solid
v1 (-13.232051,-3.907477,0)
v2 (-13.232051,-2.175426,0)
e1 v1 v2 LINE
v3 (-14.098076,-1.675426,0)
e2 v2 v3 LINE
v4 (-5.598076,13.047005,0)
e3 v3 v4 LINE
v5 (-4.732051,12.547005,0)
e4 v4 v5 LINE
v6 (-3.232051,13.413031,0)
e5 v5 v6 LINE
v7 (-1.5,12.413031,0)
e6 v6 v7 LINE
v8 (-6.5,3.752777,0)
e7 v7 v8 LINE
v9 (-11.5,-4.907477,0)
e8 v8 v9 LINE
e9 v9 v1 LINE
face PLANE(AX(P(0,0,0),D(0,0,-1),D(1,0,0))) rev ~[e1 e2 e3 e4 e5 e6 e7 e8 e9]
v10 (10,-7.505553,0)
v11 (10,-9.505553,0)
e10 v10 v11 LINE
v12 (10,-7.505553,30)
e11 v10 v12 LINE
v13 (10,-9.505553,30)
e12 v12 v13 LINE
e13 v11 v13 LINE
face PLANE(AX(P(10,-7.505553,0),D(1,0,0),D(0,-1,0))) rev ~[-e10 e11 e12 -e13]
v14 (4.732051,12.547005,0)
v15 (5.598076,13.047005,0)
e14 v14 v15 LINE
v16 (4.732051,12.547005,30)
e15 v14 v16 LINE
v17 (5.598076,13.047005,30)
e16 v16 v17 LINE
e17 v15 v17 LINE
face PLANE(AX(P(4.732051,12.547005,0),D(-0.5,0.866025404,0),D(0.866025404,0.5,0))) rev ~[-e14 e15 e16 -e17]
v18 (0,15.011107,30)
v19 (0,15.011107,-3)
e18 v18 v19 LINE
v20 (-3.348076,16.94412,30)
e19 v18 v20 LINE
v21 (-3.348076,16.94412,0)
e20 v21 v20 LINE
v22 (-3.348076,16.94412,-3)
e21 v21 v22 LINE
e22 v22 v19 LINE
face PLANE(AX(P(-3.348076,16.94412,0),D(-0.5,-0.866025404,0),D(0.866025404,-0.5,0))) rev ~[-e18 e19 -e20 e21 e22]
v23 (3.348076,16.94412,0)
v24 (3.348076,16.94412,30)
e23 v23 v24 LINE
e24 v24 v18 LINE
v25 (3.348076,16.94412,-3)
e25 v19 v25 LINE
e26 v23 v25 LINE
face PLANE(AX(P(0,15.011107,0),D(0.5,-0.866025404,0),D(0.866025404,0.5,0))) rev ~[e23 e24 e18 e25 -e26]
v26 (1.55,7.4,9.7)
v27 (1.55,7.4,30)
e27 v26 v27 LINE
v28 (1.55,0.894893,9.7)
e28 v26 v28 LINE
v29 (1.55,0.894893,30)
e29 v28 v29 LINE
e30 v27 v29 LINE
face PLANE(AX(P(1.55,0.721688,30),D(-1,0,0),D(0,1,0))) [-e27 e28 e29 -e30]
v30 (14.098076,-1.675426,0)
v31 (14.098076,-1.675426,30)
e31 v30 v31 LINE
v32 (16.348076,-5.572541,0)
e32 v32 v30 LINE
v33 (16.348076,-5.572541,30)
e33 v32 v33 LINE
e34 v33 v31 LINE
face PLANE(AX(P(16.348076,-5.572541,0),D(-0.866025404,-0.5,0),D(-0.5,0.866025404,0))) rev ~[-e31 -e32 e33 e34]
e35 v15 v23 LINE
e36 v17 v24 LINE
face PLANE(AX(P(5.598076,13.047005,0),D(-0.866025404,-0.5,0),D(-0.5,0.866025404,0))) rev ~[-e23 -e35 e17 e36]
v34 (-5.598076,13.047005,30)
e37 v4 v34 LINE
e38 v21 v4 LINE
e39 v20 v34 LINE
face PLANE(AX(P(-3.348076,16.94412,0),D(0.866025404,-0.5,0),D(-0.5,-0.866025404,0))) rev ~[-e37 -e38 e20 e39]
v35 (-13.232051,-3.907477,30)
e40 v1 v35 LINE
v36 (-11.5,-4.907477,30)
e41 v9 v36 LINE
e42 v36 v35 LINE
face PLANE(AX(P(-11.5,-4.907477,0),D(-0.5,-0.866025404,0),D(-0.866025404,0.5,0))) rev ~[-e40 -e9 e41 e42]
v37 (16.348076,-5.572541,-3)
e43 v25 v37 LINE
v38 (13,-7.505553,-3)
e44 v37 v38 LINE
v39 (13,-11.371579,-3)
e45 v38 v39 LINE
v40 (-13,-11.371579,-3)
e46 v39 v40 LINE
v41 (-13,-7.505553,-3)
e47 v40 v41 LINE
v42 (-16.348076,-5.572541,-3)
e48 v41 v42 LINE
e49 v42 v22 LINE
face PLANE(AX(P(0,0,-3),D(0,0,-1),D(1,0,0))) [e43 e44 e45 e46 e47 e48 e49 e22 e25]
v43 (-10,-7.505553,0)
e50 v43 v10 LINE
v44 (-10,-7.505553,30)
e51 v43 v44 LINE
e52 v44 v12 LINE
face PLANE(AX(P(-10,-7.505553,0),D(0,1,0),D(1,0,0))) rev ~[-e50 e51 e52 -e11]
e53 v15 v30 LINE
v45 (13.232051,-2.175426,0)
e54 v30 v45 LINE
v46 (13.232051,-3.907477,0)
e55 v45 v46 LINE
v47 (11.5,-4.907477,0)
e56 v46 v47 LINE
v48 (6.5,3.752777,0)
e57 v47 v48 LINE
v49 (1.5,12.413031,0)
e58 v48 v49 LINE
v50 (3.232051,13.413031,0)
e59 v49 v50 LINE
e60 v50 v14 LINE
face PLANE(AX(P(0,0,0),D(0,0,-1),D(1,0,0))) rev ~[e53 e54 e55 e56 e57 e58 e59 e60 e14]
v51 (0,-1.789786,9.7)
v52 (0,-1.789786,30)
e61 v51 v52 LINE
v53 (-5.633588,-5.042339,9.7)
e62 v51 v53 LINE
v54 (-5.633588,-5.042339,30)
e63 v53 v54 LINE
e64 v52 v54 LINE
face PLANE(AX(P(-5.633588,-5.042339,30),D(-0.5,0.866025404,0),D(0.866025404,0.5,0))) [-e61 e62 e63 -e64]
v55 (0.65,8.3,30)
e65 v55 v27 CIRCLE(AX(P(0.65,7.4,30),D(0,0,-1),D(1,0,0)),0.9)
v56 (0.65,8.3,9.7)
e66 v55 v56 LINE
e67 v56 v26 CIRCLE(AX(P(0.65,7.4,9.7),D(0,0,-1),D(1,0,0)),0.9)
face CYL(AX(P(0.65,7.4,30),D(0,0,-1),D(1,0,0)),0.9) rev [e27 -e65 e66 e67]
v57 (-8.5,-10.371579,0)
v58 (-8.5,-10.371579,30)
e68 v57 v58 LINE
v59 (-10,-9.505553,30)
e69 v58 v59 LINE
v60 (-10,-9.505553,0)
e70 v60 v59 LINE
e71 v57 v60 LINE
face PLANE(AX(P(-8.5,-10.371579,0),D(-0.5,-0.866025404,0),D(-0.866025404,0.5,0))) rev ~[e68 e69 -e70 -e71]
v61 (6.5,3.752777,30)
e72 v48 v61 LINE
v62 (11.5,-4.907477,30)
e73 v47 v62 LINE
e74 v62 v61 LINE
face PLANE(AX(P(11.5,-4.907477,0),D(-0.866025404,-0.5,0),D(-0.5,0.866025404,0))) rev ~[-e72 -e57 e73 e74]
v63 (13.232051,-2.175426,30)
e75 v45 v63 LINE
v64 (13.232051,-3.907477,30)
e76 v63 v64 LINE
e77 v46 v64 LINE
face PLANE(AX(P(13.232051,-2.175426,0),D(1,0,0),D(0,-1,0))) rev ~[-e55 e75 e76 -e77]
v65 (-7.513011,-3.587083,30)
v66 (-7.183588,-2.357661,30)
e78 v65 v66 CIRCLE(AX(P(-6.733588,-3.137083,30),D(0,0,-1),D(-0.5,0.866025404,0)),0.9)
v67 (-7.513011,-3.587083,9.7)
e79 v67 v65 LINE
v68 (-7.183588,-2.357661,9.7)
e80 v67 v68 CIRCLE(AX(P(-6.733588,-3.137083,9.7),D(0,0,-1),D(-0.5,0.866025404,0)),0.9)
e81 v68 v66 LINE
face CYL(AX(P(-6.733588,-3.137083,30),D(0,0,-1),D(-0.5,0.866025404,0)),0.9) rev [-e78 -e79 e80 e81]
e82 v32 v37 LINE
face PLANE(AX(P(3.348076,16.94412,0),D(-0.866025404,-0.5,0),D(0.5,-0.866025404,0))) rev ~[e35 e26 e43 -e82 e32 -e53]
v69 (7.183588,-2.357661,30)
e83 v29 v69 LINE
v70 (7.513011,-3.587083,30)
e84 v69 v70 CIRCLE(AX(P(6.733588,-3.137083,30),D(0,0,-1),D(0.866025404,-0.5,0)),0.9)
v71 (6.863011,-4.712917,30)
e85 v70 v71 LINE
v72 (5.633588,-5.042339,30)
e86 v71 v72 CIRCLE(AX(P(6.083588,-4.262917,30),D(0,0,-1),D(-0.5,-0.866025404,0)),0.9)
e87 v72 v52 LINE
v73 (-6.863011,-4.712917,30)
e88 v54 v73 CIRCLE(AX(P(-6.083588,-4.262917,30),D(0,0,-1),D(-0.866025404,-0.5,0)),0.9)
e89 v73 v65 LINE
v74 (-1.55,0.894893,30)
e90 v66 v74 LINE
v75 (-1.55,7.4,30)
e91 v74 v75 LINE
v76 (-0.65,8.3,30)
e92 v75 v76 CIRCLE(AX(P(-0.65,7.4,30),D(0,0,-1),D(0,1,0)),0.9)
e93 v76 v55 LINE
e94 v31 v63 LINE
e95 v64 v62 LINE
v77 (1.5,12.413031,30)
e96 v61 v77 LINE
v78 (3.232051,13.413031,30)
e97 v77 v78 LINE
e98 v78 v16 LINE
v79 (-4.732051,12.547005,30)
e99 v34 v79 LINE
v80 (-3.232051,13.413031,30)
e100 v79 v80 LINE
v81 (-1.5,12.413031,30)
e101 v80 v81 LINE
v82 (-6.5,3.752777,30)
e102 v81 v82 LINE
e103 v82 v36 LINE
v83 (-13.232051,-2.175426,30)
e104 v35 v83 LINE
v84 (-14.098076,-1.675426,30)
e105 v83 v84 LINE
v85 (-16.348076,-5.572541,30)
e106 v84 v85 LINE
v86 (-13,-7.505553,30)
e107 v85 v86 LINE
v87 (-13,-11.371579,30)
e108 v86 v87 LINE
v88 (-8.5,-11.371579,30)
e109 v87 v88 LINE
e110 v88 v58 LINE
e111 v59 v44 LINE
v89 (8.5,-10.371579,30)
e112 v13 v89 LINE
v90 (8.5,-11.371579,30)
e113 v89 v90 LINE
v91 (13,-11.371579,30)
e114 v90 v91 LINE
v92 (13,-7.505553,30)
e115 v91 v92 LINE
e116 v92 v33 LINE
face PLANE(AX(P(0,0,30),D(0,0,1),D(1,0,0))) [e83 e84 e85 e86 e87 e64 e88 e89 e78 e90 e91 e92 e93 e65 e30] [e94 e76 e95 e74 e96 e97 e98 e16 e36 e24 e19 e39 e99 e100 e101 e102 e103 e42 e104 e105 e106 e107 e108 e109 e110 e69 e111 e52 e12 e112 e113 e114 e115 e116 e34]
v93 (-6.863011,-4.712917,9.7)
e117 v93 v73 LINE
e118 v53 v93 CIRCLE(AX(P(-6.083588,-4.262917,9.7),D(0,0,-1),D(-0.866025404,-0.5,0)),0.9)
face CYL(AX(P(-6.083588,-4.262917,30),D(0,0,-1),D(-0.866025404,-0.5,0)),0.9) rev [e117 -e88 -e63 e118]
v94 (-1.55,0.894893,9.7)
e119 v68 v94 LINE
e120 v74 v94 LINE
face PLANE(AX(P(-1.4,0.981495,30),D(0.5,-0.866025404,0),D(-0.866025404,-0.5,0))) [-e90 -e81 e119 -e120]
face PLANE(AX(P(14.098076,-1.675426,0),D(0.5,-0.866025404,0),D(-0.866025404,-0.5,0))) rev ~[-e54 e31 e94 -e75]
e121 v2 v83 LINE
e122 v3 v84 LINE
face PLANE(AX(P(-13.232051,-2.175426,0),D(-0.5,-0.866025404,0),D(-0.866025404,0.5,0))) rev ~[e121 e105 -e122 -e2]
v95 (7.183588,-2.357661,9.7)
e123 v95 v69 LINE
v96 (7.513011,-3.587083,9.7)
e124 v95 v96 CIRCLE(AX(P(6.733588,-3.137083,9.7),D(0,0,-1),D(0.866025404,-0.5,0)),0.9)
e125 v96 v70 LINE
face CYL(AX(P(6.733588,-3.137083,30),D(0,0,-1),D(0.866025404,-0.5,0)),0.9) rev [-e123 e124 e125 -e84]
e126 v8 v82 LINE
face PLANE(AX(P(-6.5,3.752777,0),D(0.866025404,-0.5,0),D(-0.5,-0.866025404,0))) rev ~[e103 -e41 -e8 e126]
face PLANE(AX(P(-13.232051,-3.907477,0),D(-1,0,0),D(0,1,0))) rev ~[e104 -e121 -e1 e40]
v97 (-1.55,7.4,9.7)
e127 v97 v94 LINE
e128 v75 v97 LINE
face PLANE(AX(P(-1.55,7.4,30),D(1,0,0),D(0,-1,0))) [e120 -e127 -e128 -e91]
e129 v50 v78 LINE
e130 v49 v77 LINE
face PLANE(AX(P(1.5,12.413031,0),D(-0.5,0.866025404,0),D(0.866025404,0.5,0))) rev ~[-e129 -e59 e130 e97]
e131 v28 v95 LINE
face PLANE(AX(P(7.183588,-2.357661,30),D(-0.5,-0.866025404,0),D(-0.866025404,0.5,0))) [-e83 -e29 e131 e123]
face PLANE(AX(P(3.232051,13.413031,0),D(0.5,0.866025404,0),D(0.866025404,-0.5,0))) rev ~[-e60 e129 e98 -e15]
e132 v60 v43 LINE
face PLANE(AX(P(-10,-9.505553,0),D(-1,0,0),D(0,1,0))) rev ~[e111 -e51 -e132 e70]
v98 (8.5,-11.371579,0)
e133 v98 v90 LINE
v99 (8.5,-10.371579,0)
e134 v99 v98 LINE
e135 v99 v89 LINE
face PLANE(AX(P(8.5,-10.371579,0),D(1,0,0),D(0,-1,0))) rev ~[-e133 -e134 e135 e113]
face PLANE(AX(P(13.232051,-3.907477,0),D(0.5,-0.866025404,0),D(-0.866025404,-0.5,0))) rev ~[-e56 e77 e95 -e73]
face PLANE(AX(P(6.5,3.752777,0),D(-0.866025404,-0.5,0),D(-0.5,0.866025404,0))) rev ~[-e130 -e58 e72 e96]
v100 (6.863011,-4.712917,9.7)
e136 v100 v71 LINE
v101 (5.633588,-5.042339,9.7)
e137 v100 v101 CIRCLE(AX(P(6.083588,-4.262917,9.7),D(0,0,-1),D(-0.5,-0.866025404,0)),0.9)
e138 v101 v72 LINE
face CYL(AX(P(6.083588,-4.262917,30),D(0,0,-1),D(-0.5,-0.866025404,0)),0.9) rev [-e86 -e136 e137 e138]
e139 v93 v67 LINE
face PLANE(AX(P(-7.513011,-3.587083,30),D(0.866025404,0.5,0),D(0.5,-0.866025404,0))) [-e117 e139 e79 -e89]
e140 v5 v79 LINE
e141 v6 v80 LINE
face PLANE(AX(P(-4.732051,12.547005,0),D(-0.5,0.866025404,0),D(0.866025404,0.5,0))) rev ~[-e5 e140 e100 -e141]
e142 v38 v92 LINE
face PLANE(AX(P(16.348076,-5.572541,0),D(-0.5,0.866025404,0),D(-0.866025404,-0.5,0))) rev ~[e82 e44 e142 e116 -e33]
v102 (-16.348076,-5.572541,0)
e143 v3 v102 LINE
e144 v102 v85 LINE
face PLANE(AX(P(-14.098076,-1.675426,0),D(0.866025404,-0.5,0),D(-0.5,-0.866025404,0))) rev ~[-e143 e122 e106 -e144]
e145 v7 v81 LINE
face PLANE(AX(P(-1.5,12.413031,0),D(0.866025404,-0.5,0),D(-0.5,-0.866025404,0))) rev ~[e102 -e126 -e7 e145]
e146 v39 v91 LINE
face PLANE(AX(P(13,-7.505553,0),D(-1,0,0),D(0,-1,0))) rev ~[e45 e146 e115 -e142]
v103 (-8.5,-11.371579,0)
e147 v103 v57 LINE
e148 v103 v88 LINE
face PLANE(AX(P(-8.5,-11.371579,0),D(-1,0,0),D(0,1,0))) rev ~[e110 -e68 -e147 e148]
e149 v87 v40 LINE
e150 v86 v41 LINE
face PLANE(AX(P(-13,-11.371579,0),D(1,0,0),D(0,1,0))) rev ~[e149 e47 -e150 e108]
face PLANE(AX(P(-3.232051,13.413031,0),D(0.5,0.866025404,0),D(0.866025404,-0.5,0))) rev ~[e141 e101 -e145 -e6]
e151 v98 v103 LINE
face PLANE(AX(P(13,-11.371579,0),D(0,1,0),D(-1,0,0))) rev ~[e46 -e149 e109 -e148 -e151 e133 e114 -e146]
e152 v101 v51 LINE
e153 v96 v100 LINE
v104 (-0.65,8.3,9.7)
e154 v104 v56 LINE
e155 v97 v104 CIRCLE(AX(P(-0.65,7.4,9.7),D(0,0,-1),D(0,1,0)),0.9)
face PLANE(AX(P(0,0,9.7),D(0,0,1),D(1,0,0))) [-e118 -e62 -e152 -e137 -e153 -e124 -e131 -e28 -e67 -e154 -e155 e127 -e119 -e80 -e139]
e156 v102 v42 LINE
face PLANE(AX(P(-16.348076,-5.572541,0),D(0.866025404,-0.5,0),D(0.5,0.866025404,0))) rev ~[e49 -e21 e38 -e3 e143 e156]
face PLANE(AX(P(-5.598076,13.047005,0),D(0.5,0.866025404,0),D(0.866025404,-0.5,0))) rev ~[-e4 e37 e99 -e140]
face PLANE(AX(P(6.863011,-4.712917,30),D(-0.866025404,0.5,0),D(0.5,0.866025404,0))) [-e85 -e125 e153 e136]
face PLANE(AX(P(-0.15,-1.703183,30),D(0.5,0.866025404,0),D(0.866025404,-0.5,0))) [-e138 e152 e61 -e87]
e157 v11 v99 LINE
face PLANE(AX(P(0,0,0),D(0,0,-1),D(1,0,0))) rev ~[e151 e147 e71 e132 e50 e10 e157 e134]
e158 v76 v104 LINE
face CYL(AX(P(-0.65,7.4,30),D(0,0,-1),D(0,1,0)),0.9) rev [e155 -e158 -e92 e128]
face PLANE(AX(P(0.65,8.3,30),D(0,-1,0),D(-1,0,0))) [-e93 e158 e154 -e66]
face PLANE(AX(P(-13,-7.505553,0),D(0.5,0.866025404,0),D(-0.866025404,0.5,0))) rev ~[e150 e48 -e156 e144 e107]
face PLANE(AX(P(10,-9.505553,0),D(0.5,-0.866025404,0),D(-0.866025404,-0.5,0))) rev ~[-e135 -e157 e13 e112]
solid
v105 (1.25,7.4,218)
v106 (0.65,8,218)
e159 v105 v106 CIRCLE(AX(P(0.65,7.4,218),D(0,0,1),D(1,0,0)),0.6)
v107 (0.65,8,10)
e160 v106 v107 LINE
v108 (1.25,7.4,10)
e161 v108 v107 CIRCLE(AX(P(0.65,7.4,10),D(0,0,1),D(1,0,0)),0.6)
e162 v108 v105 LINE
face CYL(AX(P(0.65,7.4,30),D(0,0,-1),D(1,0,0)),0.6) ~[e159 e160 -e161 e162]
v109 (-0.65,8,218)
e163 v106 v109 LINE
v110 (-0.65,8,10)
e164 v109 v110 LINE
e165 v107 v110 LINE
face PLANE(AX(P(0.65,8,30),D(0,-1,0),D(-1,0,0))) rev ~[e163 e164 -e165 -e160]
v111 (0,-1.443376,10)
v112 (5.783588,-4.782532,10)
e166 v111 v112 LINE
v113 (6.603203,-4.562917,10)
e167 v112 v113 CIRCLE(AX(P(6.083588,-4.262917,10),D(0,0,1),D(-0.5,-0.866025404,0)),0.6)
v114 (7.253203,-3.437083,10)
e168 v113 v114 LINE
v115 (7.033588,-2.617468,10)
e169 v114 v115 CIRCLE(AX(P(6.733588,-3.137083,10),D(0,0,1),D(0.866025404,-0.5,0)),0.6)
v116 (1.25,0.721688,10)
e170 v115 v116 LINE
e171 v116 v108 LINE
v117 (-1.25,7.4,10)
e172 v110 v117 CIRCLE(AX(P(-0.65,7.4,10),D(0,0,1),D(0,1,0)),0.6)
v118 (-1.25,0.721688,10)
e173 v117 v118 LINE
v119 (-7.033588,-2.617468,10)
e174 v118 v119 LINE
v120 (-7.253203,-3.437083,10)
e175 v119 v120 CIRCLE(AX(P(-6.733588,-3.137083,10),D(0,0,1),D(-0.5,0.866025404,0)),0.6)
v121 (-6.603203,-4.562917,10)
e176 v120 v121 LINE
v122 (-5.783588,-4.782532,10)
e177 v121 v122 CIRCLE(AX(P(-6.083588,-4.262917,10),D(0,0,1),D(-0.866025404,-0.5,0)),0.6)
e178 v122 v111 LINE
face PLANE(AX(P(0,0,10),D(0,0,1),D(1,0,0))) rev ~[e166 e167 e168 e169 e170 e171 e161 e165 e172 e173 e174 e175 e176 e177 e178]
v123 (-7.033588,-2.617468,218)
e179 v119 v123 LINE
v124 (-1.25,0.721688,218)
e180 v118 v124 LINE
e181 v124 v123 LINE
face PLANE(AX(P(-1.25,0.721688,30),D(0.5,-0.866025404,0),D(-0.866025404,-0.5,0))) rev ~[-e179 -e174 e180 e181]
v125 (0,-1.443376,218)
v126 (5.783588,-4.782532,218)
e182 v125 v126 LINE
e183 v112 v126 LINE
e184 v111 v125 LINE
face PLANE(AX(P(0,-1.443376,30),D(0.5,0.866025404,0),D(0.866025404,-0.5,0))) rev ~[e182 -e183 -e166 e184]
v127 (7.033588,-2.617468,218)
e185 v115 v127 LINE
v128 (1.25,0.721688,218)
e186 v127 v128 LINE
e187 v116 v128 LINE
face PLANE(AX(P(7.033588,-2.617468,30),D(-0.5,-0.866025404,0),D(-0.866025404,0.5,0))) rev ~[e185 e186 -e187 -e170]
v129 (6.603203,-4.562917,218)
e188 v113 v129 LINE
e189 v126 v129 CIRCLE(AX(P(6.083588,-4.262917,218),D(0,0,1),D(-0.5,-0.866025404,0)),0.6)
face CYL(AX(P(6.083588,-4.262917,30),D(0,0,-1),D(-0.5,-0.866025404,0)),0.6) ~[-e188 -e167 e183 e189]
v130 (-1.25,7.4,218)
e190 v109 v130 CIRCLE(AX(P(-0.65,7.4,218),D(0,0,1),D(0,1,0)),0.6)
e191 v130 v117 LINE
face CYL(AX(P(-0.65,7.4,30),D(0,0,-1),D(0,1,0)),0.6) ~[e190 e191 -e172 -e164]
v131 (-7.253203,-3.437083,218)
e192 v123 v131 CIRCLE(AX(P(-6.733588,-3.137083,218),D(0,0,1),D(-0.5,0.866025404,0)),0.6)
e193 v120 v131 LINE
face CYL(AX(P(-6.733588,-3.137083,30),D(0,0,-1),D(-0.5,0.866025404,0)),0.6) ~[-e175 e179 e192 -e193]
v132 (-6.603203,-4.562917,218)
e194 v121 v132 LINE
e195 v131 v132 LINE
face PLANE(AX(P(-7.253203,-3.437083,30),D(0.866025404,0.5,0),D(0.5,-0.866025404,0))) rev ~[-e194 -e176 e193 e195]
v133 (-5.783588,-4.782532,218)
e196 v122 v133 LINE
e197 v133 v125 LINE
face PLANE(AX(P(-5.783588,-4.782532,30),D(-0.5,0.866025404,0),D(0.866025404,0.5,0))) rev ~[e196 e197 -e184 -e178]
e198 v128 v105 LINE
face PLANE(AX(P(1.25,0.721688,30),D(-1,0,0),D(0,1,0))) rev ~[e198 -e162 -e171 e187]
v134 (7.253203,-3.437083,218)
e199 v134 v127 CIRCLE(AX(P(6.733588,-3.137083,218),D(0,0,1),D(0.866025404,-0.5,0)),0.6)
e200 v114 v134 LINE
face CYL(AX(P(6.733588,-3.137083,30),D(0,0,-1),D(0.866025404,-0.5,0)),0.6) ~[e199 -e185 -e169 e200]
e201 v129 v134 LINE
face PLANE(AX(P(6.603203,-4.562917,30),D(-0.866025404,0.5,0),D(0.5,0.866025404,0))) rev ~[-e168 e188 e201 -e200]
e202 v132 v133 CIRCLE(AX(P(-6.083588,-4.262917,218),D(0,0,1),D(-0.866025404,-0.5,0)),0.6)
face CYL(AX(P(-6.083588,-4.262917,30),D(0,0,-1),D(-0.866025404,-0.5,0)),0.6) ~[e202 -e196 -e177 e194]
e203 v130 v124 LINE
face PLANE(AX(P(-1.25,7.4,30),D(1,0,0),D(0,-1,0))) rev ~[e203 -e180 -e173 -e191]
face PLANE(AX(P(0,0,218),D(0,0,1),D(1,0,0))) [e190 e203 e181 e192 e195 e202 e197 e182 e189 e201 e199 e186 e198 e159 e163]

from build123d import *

# Parameters (mm, degrees)
F1_DEPTH      = 30
F3_DEPTH      = 3
F5_DEPTH      = 20
F5_DEPTH_BACK = 188
F6_OFFSET     = 0.3


with BuildPart() as f1:
    # F0 (on Top) → F1 (new body)
    with BuildSketch(Plane.XY):
        Polygon((-10, -7.5055534995), (0, -7.5055534995), (10, -7.5055534995), (10, -9.5055534995), (8.5, -10.3715789032), (8.5, -11.3715789032), (13, -11.3715789032), (13, -7.5055534995), (16.3480762114, -5.5725407976), (14.0980762114, -1.6754264805), (13.2320508076, -2.1754264805), (13.2320508076, -3.9074772881), (11.5, -4.9074772881), (6.5, 3.7527767497), (1.5, 12.4130307876), (3.2320508076, 13.4130307876), (4.7320508076, 12.5470053838), (5.5980762114, 13.0470053838), (3.3480762114, 16.9441197008), (0, 15.0111069989), (-3.3480762114, 16.9441197008), (-5.5980762114, 13.0470053838), (-4.7320508076, 12.5470053838), (-3.2320508076, 13.4130307876), (-1.5, 12.4130307876), (-6.5, 3.7527767497), (-11.5, -4.9074772881), (-13.2320508076, -3.9074772881), (-13.2320508076, -2.1754264805), (-14.0980762114, -1.6754264805), (-16.3480762114, -5.5725407976), (-13, -7.5055534995), (-13, -11.3715789032), (-8.5, -11.3715789032), (-8.5, -10.3715789032), (-10, -9.5055534995), align=None)
    extrude(amount=F1_DEPTH)

    # F2 (on face) → F3 (join)
    with BuildSketch(Plane(origin=(0, 0, 0), x_dir=(1, 0, 0), z_dir=(0, 0, -1))):
        Polygon((13, 11.3715789032), (-13, 11.3715789032), (-13, 7.5055534995), (-16.3480762114, 5.5725407976), (-3.3480762114, -16.9441197008), (0, -15.0111069989), (3.3480762114, -16.9441197008), (16.3480762114, 5.5725407976), (13, 7.5055534995), align=None)
    extrude(amount=F3_DEPTH)


with BuildPart() as f5:
    # F4 (on face) → F5 (new body, two sides)
    with BuildSketch(Plane.XY.offset(30)) as f5_sk:
        with BuildLine():
            Line((-1.25, 7.4), (-1.25, 0.7216878365))
            Line((-1.25, 0.7216878365), (-7.033587988, -2.6174682453))
            ThreePointArc((-7.033587988, -2.6174682453), (-7.3131434838, -2.9817920605), (-7.2532032303, -3.4370834875))
            Line((-7.2532032303, -3.4370834875), (-6.6032032303, -4.5629165125))
            ThreePointArc((-6.6032032303, -4.5629165125), (-6.2388794151, -4.8424720082), (-5.783587988, -4.7825317547))
            Line((-5.783587988, -4.7825317547), (0, -1.443375673))
            Line((0, -1.443375673), (5.783587988, -4.7825317547))
            ThreePointArc((5.783587988, -4.7825317547), (6.2388794151, -4.8424720082), (6.6032032303, -4.5629165125))
            Line((6.6032032303, -4.5629165125), (7.2532032303, -3.4370834875))
            ThreePointArc((7.2532032303, -3.4370834875), (7.3131434838, -2.9817920605), (7.033587988, -2.6174682453))
            Line((7.033587988, -2.6174682453), (1.25, 0.7216878365))
            Line((1.25, 0.7216878365), (1.25, 7.4))
            ThreePointArc((1.25, 7.4), (1.0742640687, 7.8242640687), (0.65, 8))
            Line((0.65, 8), (-0.65, 8))
            ThreePointArc((-0.65, 8), (-1.0742640687, 7.8242640687), (-1.25, 7.4))
        make_face()
    extrude(amount=-F5_DEPTH)
    extrude(f5_sk.sketch, amount=F5_DEPTH_BACK)


with BuildPart() as f1_1:
    add(f1.part)

    # F6: cut F5, made larger all round first
    f6_tool = offset(f5.part, amount=F6_OFFSET, kind=Kind.INTERSECTION, mode=Mode.PRIVATE)
    add(f6_tool, mode=Mode.SUBTRACT)


solid = Compound([f5.part, f1_1.part])
